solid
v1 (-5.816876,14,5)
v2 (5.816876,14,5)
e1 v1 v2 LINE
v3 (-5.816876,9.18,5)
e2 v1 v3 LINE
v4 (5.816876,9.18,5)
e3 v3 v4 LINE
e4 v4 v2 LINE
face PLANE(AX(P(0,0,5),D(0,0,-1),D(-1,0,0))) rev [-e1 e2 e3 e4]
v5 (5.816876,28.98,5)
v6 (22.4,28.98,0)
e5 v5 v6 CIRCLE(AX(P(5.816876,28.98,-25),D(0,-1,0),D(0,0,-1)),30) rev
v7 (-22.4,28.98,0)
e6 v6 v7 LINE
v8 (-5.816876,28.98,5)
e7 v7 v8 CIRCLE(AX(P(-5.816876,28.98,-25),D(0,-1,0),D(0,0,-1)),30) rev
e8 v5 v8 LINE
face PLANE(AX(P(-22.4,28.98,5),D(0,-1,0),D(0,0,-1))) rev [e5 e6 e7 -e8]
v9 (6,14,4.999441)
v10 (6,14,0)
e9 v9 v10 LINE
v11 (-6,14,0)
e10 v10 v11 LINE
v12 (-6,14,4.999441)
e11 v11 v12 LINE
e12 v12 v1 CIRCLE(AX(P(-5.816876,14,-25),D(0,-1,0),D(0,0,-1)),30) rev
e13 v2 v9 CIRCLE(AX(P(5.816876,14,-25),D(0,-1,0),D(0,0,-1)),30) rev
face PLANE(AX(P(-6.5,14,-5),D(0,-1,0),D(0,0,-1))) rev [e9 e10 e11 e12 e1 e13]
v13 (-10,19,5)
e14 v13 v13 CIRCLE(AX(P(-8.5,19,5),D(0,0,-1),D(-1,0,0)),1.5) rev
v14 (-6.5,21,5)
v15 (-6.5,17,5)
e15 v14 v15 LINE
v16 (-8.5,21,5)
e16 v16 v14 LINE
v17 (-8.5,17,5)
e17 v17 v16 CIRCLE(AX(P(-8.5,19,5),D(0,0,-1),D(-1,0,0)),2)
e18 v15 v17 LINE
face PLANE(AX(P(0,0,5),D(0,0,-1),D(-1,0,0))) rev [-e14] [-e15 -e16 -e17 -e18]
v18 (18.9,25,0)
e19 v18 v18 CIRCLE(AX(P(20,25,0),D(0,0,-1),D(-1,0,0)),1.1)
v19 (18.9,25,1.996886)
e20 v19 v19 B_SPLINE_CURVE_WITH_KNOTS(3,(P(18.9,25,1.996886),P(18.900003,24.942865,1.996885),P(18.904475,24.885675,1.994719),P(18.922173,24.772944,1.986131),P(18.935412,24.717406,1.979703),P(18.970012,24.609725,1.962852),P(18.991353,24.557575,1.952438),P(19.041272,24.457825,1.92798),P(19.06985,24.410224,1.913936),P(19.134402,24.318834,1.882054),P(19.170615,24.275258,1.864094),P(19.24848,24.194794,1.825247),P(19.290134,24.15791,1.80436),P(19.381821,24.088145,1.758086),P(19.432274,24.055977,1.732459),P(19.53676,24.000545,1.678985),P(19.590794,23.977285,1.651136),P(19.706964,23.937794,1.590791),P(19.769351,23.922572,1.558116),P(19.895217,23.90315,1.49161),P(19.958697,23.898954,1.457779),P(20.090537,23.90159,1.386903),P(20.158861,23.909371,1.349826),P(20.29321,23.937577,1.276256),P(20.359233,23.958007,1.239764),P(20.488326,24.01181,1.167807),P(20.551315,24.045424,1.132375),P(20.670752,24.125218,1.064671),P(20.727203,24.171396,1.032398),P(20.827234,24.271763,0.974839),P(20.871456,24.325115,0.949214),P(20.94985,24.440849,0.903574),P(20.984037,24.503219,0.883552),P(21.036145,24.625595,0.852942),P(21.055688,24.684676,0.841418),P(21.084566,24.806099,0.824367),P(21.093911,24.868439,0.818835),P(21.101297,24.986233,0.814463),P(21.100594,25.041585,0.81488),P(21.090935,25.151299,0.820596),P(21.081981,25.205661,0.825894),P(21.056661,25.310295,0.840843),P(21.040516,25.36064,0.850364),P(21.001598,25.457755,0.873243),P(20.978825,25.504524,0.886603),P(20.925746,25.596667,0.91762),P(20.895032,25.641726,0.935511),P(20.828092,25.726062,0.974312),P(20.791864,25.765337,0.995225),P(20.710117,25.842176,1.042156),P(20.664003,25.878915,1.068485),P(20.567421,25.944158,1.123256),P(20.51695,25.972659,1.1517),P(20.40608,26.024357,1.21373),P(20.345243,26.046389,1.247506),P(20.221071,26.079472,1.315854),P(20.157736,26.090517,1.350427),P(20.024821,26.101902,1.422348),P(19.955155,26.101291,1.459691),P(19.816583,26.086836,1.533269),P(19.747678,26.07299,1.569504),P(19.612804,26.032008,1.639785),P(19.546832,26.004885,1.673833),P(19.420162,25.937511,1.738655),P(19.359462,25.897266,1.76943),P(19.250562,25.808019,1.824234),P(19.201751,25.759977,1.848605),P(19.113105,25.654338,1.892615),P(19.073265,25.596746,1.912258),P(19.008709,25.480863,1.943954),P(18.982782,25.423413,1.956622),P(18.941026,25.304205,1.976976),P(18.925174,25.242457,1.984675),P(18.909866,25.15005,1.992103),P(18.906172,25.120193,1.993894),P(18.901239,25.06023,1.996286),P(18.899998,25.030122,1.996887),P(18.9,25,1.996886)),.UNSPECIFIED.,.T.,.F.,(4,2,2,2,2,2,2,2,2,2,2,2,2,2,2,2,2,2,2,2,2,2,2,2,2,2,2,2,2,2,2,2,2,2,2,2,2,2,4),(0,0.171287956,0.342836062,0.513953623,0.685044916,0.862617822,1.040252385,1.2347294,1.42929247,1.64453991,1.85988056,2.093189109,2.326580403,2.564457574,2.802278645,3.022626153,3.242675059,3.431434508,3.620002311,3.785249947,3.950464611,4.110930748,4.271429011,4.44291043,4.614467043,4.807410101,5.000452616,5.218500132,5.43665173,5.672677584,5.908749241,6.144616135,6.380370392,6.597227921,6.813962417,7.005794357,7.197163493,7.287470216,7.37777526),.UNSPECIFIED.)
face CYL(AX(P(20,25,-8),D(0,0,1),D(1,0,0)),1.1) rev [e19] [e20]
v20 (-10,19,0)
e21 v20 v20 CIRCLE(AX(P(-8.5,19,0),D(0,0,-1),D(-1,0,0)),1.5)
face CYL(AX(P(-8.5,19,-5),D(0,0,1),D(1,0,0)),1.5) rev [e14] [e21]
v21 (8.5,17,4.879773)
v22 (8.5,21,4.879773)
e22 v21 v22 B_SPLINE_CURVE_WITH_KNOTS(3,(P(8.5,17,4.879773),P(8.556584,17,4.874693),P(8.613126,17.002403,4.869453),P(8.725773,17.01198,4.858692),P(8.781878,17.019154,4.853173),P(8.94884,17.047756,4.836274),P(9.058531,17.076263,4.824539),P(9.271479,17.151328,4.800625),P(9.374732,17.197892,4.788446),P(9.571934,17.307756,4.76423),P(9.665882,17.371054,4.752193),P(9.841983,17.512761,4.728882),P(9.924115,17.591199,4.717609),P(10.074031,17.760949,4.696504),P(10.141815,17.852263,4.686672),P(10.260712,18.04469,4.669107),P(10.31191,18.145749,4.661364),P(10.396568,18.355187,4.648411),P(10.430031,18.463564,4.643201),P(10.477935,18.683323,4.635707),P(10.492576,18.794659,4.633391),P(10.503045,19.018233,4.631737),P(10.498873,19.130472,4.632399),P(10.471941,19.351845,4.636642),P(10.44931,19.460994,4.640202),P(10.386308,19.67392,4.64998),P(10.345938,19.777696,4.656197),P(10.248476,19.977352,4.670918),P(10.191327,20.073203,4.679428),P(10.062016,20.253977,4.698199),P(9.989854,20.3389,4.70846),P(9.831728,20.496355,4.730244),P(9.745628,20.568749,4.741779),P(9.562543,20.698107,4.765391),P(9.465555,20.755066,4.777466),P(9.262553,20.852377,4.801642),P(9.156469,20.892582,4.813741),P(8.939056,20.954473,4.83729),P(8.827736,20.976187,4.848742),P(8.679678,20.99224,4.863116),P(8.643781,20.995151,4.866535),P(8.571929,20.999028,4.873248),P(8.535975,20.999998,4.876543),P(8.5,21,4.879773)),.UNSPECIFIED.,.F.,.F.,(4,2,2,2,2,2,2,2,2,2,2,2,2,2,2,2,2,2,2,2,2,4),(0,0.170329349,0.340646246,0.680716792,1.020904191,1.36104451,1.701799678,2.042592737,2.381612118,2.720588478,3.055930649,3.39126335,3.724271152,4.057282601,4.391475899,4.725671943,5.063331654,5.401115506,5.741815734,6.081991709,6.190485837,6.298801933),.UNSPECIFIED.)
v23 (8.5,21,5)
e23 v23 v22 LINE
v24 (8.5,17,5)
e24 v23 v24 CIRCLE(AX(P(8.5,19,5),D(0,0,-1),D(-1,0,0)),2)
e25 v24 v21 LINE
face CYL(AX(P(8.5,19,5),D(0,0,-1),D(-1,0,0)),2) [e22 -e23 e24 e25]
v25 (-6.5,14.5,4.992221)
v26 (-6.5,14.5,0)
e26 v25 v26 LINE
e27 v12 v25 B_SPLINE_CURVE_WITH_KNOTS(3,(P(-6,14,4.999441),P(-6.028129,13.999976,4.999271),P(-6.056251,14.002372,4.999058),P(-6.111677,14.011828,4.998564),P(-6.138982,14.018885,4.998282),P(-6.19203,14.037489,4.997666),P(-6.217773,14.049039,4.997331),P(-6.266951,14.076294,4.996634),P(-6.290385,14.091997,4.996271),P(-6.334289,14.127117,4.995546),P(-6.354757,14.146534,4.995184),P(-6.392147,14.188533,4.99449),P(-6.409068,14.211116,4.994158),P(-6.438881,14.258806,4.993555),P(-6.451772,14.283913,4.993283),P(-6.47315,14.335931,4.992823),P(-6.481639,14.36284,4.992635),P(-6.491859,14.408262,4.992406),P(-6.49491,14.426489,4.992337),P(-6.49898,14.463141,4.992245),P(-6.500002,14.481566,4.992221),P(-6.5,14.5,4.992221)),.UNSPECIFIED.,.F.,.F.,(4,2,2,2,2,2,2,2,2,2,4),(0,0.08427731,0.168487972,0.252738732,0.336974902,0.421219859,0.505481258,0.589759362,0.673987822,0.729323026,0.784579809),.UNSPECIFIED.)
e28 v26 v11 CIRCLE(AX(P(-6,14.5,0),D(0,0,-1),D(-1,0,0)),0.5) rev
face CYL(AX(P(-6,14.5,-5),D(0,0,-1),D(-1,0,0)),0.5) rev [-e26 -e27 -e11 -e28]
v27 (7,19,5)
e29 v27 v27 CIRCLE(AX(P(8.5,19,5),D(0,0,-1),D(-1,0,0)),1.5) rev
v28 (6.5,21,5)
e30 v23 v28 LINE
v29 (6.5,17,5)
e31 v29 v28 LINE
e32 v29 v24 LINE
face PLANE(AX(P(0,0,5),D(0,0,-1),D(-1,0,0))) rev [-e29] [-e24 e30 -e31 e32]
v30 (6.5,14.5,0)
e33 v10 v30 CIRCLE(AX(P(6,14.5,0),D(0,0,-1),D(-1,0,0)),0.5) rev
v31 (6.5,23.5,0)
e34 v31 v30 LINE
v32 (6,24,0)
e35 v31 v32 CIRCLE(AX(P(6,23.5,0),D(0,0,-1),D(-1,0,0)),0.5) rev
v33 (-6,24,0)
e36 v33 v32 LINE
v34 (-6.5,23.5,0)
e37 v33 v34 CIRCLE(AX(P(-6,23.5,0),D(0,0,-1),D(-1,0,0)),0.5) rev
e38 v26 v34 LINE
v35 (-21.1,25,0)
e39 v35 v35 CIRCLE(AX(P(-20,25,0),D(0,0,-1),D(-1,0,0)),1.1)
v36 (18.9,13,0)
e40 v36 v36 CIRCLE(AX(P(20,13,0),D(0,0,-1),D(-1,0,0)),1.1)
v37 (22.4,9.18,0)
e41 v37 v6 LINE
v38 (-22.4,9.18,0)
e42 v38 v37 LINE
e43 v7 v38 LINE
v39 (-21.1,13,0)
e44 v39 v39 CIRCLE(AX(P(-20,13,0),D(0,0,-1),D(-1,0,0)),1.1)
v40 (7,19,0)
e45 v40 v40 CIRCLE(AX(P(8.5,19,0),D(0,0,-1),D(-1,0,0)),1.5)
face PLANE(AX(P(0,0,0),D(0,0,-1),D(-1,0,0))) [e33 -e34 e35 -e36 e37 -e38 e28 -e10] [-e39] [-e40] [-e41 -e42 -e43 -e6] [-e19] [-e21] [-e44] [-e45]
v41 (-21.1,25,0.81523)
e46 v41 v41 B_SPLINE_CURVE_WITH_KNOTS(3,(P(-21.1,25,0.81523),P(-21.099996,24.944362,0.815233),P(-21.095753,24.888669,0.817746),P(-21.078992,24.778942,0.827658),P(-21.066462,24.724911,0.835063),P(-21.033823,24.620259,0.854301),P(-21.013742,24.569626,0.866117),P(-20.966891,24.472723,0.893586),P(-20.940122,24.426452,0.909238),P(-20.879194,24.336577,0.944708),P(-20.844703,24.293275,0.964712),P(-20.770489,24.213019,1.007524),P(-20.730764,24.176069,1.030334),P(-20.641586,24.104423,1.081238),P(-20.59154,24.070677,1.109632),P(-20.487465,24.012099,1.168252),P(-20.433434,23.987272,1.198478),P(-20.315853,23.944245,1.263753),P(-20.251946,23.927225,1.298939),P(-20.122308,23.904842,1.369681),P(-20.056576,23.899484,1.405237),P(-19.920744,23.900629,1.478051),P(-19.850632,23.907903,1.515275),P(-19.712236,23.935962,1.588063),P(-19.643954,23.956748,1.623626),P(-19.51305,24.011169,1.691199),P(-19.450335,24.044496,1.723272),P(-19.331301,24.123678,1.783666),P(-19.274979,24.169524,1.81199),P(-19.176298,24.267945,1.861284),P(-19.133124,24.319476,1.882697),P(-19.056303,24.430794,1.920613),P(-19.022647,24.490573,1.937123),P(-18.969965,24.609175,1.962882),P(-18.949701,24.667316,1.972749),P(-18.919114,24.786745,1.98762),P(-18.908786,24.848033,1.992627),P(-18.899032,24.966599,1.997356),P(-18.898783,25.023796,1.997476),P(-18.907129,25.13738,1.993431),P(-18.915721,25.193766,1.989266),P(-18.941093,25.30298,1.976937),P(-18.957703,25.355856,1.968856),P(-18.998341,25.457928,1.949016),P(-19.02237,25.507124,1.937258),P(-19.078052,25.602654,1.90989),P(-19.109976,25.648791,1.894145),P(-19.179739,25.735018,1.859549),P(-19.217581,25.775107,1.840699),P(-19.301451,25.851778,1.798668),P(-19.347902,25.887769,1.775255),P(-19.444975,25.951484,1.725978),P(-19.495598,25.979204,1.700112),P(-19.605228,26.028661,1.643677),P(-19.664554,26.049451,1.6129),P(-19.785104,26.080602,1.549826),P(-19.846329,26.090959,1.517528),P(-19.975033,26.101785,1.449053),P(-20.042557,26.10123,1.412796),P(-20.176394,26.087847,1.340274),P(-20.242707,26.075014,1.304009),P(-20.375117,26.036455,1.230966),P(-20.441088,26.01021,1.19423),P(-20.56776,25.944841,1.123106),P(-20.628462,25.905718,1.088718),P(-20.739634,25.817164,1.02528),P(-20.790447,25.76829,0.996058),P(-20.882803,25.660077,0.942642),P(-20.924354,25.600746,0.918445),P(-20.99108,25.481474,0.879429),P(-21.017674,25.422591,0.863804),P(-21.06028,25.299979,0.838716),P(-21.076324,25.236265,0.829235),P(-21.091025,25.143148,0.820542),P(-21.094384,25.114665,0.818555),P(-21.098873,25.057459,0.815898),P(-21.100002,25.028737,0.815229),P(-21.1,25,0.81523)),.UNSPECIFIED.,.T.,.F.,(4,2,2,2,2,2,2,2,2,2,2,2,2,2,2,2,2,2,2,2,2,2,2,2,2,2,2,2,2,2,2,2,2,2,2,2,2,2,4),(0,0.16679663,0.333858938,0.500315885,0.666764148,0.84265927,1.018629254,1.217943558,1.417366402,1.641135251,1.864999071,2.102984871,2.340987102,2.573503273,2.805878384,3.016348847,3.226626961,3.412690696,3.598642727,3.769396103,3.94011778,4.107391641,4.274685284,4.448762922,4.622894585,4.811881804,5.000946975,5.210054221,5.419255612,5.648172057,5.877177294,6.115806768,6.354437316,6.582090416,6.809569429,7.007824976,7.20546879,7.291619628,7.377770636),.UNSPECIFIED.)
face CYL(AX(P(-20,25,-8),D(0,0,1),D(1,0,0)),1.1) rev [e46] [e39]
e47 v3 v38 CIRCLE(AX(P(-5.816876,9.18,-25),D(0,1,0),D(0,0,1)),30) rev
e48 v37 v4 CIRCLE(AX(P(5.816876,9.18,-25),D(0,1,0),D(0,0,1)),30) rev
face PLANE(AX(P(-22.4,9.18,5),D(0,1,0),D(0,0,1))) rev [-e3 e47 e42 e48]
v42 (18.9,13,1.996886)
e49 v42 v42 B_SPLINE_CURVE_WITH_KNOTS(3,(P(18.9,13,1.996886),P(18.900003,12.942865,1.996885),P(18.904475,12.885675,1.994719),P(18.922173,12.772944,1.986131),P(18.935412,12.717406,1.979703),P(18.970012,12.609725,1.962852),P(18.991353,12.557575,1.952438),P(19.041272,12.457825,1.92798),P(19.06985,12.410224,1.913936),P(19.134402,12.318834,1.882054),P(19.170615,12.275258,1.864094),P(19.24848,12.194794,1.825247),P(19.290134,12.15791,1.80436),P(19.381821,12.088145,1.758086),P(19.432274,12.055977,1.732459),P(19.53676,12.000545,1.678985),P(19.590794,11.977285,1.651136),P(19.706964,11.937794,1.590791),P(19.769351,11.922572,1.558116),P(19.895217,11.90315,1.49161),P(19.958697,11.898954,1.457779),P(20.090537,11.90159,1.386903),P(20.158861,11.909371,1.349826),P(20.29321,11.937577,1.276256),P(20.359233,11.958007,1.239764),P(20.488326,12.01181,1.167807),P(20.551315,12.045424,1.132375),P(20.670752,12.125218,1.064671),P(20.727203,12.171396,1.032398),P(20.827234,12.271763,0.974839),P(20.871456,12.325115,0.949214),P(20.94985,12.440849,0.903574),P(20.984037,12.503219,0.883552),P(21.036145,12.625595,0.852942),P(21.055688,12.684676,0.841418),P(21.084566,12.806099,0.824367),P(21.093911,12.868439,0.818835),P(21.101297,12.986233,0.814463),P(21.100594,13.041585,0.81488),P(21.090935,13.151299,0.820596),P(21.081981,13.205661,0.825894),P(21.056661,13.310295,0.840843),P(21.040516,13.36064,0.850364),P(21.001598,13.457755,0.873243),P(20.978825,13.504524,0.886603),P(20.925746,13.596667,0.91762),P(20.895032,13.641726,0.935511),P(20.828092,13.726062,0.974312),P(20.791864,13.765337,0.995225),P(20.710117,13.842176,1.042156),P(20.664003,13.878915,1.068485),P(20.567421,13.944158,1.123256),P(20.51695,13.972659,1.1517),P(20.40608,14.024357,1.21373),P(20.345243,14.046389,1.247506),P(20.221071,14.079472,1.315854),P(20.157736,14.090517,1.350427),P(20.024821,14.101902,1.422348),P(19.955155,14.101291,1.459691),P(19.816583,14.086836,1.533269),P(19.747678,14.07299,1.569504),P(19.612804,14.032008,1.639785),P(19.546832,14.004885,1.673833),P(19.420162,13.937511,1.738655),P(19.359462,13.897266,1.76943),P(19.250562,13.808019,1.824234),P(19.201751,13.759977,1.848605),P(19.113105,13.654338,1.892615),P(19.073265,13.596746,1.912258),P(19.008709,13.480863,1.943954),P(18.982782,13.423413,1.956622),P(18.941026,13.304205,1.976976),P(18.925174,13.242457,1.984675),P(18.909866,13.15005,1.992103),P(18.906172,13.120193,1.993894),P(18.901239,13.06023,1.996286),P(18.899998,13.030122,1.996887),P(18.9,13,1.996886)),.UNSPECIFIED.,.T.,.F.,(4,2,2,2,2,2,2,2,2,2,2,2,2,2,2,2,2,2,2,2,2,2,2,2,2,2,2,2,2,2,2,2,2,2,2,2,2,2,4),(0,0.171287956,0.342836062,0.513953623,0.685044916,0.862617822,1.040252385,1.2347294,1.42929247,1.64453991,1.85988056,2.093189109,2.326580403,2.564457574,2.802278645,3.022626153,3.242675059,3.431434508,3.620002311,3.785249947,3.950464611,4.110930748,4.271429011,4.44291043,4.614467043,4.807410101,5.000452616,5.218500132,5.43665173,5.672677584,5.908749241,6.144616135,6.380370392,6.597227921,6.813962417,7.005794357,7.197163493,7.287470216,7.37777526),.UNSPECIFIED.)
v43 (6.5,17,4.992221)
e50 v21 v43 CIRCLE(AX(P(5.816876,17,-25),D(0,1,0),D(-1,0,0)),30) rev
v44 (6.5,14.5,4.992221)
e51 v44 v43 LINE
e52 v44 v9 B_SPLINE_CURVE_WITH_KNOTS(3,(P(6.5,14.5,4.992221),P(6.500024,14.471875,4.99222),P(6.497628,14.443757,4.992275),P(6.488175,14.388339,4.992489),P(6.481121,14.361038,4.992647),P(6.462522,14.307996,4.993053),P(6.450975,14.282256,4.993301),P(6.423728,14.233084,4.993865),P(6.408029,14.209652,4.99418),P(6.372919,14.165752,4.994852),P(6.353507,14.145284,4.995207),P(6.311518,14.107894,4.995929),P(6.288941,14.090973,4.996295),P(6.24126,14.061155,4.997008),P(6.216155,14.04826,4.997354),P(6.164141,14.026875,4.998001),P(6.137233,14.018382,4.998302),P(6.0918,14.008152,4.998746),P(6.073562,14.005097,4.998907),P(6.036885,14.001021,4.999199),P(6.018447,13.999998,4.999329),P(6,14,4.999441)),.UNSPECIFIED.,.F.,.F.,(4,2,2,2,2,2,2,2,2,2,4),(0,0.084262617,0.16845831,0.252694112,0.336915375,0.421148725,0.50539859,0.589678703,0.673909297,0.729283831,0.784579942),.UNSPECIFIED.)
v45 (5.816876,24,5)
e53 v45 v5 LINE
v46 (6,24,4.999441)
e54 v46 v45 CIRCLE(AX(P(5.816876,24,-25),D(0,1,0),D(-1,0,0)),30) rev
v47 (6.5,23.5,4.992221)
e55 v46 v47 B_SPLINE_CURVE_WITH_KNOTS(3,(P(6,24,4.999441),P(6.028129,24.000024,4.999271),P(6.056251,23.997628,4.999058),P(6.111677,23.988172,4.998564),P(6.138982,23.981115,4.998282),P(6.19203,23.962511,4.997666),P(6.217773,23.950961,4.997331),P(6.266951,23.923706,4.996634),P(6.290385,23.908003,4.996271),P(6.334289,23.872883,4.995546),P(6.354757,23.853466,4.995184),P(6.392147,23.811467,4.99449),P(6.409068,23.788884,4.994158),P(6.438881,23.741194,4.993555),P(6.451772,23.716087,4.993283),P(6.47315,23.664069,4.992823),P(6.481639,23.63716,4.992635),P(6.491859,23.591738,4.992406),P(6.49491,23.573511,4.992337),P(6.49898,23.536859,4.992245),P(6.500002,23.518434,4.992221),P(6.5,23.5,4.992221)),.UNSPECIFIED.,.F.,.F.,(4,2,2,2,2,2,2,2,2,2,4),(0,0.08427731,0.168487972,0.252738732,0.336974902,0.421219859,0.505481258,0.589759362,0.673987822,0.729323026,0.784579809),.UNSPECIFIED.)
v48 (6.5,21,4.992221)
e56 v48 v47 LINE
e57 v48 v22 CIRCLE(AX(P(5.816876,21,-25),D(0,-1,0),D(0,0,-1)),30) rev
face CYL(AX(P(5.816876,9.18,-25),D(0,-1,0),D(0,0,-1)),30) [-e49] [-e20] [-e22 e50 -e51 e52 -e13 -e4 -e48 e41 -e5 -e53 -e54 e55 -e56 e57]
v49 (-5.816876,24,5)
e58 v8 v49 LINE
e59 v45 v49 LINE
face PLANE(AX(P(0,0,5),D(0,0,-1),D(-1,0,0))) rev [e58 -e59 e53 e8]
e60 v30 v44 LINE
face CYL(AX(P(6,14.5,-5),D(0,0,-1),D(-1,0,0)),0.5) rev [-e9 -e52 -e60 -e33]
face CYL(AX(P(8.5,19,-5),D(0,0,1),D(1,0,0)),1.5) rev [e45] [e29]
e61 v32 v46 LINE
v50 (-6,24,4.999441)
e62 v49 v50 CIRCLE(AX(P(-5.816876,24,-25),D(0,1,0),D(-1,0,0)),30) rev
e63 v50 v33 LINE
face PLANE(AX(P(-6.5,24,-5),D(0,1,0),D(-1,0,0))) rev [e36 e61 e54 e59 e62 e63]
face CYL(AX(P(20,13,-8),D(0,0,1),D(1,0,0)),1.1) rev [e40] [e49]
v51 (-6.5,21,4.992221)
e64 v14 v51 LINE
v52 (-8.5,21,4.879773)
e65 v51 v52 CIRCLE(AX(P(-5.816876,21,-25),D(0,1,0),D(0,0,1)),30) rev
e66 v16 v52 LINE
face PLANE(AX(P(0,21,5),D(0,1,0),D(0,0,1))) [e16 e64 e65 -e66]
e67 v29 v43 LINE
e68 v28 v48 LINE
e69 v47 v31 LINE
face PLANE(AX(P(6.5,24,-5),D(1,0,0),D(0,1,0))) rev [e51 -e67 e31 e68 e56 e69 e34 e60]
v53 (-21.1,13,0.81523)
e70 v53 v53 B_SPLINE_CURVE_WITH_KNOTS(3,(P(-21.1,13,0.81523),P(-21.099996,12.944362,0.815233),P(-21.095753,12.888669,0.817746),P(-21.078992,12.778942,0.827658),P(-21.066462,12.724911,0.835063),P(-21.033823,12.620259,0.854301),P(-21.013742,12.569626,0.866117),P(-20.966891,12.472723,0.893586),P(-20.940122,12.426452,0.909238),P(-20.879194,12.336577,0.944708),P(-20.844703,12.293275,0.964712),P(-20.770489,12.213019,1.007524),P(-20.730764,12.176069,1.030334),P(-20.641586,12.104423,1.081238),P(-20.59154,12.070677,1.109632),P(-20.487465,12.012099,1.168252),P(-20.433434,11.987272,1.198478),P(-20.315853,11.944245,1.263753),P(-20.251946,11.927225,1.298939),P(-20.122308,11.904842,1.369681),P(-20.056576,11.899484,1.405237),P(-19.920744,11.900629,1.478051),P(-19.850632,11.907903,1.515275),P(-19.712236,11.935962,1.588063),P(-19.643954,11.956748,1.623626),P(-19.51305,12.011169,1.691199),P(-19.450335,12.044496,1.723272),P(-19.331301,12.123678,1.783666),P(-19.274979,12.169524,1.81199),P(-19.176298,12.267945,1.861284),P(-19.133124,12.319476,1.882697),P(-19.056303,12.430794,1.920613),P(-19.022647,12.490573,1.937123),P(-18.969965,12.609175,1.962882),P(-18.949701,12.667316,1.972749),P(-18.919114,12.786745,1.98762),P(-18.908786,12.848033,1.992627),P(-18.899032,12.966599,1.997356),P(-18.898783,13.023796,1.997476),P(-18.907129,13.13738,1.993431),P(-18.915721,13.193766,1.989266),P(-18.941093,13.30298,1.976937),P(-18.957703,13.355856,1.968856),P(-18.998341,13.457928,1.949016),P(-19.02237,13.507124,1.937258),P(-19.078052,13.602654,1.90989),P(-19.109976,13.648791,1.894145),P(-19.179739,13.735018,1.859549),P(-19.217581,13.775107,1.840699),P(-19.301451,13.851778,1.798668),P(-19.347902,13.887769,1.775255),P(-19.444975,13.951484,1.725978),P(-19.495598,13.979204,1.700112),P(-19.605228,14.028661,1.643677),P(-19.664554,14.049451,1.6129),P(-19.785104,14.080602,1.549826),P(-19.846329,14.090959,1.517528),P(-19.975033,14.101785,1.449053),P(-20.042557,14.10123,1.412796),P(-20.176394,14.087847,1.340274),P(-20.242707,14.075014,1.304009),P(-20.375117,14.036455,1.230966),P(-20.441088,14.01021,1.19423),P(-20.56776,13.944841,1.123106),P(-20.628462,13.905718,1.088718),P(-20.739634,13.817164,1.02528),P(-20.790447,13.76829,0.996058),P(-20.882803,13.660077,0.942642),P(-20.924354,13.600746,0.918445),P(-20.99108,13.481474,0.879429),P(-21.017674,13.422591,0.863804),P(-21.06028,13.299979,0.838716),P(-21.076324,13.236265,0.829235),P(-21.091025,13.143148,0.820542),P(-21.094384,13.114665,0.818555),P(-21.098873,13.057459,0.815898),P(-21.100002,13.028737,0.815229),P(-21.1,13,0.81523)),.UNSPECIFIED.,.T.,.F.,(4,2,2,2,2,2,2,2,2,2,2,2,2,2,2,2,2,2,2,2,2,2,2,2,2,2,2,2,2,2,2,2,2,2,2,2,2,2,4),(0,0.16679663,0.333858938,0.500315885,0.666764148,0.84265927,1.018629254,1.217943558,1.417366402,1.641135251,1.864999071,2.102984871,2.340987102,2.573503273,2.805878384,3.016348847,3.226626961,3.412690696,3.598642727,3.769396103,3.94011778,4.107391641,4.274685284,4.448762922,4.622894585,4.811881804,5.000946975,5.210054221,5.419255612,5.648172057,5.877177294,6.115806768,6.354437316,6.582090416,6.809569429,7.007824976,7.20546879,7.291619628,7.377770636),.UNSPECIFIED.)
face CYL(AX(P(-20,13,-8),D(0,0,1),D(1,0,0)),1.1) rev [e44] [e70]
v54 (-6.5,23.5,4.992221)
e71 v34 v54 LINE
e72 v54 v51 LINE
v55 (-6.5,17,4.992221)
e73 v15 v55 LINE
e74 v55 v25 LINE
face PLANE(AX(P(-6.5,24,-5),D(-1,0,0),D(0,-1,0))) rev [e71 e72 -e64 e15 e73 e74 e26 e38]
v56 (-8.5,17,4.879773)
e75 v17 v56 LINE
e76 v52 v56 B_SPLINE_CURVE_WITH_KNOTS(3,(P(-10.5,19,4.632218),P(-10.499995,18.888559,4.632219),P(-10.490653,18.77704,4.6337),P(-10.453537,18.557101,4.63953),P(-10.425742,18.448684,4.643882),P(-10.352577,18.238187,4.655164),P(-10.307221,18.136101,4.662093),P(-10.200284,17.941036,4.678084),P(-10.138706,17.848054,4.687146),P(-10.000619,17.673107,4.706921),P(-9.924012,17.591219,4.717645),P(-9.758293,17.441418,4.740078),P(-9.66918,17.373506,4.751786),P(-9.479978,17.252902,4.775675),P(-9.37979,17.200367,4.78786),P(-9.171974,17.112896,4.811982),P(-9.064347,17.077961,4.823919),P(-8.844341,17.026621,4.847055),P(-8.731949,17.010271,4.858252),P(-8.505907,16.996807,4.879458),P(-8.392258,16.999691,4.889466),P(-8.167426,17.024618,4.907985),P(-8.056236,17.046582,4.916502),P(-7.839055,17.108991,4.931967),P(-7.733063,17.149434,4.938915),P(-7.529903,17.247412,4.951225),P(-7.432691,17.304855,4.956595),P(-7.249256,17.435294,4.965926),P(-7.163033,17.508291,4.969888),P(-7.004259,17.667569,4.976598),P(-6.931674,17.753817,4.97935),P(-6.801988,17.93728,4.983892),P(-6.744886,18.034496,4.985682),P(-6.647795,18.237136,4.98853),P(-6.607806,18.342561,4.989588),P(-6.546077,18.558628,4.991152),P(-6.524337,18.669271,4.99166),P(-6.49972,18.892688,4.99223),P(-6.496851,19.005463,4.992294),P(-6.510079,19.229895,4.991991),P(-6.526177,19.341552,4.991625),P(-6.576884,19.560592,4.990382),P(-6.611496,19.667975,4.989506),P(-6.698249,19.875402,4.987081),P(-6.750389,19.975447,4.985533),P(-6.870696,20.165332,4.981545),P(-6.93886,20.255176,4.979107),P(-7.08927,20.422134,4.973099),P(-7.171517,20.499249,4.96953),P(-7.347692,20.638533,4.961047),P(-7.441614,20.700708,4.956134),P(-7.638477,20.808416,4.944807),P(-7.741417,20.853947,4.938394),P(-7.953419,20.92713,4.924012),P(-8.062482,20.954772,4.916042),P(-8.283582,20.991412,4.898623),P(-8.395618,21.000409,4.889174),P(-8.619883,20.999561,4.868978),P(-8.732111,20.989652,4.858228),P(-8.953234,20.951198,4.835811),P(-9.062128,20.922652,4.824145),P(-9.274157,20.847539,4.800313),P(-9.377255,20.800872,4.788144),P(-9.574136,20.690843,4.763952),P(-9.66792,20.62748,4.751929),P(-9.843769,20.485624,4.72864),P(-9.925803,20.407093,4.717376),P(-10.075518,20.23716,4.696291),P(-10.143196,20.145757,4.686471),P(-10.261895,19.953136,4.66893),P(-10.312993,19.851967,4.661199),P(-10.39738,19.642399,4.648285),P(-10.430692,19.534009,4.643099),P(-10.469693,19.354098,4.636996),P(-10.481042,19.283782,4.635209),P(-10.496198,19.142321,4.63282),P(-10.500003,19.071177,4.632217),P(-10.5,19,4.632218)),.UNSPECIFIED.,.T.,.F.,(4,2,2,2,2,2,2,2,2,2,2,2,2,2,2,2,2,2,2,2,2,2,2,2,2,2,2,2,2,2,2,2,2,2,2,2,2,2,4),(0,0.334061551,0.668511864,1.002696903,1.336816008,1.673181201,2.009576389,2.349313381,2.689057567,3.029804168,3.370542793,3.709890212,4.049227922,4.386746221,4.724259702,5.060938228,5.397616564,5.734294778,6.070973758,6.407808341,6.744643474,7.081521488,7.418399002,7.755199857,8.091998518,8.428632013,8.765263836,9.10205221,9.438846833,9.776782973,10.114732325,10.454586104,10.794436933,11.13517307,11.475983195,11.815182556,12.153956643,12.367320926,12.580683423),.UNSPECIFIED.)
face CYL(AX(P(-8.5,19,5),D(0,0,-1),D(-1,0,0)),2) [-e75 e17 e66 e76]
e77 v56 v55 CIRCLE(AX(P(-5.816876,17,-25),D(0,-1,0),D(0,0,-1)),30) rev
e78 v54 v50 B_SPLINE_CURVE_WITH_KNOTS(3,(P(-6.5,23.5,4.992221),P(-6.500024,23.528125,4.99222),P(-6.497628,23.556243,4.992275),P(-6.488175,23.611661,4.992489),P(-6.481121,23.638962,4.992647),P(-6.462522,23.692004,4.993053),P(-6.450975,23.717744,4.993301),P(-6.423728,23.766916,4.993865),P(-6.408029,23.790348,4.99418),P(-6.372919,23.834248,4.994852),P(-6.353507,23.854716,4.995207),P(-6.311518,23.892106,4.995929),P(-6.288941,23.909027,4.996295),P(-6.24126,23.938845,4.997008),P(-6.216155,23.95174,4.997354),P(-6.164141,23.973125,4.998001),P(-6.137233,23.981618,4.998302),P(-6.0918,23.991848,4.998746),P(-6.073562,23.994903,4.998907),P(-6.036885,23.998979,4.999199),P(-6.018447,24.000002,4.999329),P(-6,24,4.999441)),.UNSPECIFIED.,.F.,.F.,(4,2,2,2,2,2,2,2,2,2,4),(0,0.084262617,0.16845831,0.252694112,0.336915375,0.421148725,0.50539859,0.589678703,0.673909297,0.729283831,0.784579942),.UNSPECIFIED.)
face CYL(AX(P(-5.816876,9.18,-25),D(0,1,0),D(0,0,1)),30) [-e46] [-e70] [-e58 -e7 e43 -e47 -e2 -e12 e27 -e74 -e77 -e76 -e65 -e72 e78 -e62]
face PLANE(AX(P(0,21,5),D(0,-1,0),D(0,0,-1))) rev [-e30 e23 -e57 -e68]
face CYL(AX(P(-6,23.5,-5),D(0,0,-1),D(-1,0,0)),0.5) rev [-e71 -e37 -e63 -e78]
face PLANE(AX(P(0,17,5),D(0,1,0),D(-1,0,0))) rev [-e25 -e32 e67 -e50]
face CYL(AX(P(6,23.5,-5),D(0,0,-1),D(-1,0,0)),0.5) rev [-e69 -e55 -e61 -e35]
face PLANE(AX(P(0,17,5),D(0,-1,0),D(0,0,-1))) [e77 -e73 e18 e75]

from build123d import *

# Parameters (mm, degrees)
SKETCH1_W           = 44.8
SKETCH1_H           = 19.8
BOSS_EXTRUDE1_DEPTH = 5
SKETCH2_R           = 1.1
CUT_EXTRUDE1_DEPTH  = 13
SKETCH3_R           = 1.5
CUT_EXTRUDE2_DEPTH  = 10
FILLET1_R           = 30
SKETCH4_W           = 13
SKETCH4_H           = 10
CUT_EXTRUDE3_DEPTH  = 10
BOSS_EXTRUDE2_START = -5
SKETCH5_R           = 2
SKETCH5_R_2         = 1.5
BOSS_EXTRUDE2_DEPTH = 5
FILLET2_R           = 0.5


with BuildPart() as part:
    # Sketch1 → Boss-Extrude1 (new body)
    with BuildSketch(Plane.XY):
        with Locations((0, 19.08)):
            Rectangle(SKETCH1_W, SKETCH1_H)
    extrude(amount=BOSS_EXTRUDE1_DEPTH)

    # Sketch2 → Cut-Extrude1 (cut)
    with BuildSketch(Plane.XY.offset(5)):
        with Locations((-20, 25)):
            Circle(SKETCH2_R)
        with Locations((-20, 13)):
            Circle(SKETCH2_R)
        with Locations((20, 25)):
            Circle(SKETCH2_R)
        with Locations((20, 13)):
            Circle(SKETCH2_R)
    extrude(amount=-CUT_EXTRUDE1_DEPTH, mode=Mode.SUBTRACT)

    # Sketch3 → Cut-Extrude2 (cut)
    with BuildSketch(Plane.XY.offset(5)):
        with Locations((-8.5, 19)):
            Circle(SKETCH3_R)
        with Locations((8.5, 19)):
            Circle(SKETCH3_R)
    extrude(amount=-CUT_EXTRUDE2_DEPTH, mode=Mode.SUBTRACT)

    # Fillet1
    # the kernel refuses this fillet: 30 mm, written as the material it takes off along each edge
    with BuildSketch(Plane(origin=(22.4, -32.277809879, 5), x_dir=(0, 0, -1), z_dir=(0, 1, 0)), Plane(origin=(-22.4, 70.437809879, 5), x_dir=(0, 0, -1), z_dir=(0, -1, 0))) as fillet1_piece_1:
        with BuildLine():
            CenterArc((30, 16.583123952), FILLET1_R, 180, 33.557309762)
            Line((0, 16.583123952), (-0.6, 16.583123952))
            Line((-0.6, 16.583123952), (-0.6, 0))
            Line((-0.6, 0), (0, -0.6))
            ThreePointArc((0, -0.6), (2.5, -0.6), (4.5, -0.331662479))
            Line((4.5, -0.331662479), (5, 0))
        make_face()
    extrude(amount=102.715619759, mode=Mode.SUBTRACT)

    # Sketch4 → Cut-Extrude3 (cut)
    with BuildSketch(Plane.XY.offset(5)):
        with Locations((0, 19)):
            Rectangle(SKETCH4_W, SKETCH4_H)
    extrude(amount=-CUT_EXTRUDE3_DEPTH, mode=Mode.SUBTRACT)

    # Sketch5 → Boss-Extrude2 (add)
    # profile 1 of 6: a face of its own
    with BuildSketch(Plane(origin=(0, 0, 0), x_dir=(-1, 0, 0), z_dir=(0, 0, -1)).offset(BOSS_EXTRUDE2_START)):
        with Locations((-8.5, 19)):
            Circle(SKETCH5_R)
        with Locations((-8.5, 19)):
            Circle(SKETCH5_R_2, mode=Mode.SUBTRACT)
    # profile 2 of 6: a face of its own
    with BuildSketch(Plane(origin=(0, 0, 0), x_dir=(-1, 0, 0), z_dir=(0, 0, -1)).offset(BOSS_EXTRUDE2_START)):
        with BuildLine():
            Line((-6.5, 21), (-8.5, 21))
            ThreePointArc((-8.5, 21), (-7.085786438, 20.414213562), (-6.5, 19))
            Line((-6.5, 19), (-6.5, 21))
        make_face()
    # profile 3 of 6: a face of its own
    with BuildSketch(Plane(origin=(0, 0, 0), x_dir=(-1, 0, 0), z_dir=(0, 0, -1)).offset(BOSS_EXTRUDE2_START)):
        with BuildLine():
            Line((-6.5, 17), (-6.5, 19))
            ThreePointArc((-6.5, 19), (-7.085786438, 17.585786438), (-8.5, 17))
            Line((-8.5, 17), (-6.5, 17))
        make_face()
    # profile 4 of 6: a face of its own
    with BuildSketch(Plane(origin=(0, 0, 0), x_dir=(-1, 0, 0), z_dir=(0, 0, -1)).offset(BOSS_EXTRUDE2_START)):
        with Locations((8.5, 19)):
            Circle(SKETCH5_R)
        with Locations((8.5, 19)):
            Circle(SKETCH5_R_2, mode=Mode.SUBTRACT)
    # profile 5 of 6: a face of its own
    with BuildSketch(Plane(origin=(0, 0, 0), x_dir=(-1, 0, 0), z_dir=(0, 0, -1)).offset(BOSS_EXTRUDE2_START)):
        with BuildLine():
            ThreePointArc((8.5, 17), (7.08578644, 17.585786436), (6.5, 18.999999994))
            Line((6.5, 18.999999994), (6.5, 17))
            Line((6.5, 17), (8.5, 17))
        make_face()
    # profile 6 of 6: a face of its own
    with BuildSketch(Plane(origin=(0, 0, 0), x_dir=(-1, 0, 0), z_dir=(0, 0, -1)).offset(BOSS_EXTRUDE2_START)):
        with BuildLine():
            ThreePointArc((6.5, 18.999999994), (7.085786436, 20.41421356), (8.5, 21))
            Line((8.5, 21), (6.5, 21))
            Line((6.5, 21), (6.5, 18.999999994))
        make_face()
    extrude(amount=BOSS_EXTRUDE2_DEPTH)

    # Fillet2
    fillet2_edges = [part.edges().sort_by_distance(p)[0] for p in [
        (-6.5, 14, 2.496110676),
        (-6.5, 24, 2.496110676),
        (6.5, 24, 2.496110676),
        (6.5, 14, 2.496110676),
    ]]
    fillet(fillet2_edges, radius=FILLET2_R)


solid = part.part
